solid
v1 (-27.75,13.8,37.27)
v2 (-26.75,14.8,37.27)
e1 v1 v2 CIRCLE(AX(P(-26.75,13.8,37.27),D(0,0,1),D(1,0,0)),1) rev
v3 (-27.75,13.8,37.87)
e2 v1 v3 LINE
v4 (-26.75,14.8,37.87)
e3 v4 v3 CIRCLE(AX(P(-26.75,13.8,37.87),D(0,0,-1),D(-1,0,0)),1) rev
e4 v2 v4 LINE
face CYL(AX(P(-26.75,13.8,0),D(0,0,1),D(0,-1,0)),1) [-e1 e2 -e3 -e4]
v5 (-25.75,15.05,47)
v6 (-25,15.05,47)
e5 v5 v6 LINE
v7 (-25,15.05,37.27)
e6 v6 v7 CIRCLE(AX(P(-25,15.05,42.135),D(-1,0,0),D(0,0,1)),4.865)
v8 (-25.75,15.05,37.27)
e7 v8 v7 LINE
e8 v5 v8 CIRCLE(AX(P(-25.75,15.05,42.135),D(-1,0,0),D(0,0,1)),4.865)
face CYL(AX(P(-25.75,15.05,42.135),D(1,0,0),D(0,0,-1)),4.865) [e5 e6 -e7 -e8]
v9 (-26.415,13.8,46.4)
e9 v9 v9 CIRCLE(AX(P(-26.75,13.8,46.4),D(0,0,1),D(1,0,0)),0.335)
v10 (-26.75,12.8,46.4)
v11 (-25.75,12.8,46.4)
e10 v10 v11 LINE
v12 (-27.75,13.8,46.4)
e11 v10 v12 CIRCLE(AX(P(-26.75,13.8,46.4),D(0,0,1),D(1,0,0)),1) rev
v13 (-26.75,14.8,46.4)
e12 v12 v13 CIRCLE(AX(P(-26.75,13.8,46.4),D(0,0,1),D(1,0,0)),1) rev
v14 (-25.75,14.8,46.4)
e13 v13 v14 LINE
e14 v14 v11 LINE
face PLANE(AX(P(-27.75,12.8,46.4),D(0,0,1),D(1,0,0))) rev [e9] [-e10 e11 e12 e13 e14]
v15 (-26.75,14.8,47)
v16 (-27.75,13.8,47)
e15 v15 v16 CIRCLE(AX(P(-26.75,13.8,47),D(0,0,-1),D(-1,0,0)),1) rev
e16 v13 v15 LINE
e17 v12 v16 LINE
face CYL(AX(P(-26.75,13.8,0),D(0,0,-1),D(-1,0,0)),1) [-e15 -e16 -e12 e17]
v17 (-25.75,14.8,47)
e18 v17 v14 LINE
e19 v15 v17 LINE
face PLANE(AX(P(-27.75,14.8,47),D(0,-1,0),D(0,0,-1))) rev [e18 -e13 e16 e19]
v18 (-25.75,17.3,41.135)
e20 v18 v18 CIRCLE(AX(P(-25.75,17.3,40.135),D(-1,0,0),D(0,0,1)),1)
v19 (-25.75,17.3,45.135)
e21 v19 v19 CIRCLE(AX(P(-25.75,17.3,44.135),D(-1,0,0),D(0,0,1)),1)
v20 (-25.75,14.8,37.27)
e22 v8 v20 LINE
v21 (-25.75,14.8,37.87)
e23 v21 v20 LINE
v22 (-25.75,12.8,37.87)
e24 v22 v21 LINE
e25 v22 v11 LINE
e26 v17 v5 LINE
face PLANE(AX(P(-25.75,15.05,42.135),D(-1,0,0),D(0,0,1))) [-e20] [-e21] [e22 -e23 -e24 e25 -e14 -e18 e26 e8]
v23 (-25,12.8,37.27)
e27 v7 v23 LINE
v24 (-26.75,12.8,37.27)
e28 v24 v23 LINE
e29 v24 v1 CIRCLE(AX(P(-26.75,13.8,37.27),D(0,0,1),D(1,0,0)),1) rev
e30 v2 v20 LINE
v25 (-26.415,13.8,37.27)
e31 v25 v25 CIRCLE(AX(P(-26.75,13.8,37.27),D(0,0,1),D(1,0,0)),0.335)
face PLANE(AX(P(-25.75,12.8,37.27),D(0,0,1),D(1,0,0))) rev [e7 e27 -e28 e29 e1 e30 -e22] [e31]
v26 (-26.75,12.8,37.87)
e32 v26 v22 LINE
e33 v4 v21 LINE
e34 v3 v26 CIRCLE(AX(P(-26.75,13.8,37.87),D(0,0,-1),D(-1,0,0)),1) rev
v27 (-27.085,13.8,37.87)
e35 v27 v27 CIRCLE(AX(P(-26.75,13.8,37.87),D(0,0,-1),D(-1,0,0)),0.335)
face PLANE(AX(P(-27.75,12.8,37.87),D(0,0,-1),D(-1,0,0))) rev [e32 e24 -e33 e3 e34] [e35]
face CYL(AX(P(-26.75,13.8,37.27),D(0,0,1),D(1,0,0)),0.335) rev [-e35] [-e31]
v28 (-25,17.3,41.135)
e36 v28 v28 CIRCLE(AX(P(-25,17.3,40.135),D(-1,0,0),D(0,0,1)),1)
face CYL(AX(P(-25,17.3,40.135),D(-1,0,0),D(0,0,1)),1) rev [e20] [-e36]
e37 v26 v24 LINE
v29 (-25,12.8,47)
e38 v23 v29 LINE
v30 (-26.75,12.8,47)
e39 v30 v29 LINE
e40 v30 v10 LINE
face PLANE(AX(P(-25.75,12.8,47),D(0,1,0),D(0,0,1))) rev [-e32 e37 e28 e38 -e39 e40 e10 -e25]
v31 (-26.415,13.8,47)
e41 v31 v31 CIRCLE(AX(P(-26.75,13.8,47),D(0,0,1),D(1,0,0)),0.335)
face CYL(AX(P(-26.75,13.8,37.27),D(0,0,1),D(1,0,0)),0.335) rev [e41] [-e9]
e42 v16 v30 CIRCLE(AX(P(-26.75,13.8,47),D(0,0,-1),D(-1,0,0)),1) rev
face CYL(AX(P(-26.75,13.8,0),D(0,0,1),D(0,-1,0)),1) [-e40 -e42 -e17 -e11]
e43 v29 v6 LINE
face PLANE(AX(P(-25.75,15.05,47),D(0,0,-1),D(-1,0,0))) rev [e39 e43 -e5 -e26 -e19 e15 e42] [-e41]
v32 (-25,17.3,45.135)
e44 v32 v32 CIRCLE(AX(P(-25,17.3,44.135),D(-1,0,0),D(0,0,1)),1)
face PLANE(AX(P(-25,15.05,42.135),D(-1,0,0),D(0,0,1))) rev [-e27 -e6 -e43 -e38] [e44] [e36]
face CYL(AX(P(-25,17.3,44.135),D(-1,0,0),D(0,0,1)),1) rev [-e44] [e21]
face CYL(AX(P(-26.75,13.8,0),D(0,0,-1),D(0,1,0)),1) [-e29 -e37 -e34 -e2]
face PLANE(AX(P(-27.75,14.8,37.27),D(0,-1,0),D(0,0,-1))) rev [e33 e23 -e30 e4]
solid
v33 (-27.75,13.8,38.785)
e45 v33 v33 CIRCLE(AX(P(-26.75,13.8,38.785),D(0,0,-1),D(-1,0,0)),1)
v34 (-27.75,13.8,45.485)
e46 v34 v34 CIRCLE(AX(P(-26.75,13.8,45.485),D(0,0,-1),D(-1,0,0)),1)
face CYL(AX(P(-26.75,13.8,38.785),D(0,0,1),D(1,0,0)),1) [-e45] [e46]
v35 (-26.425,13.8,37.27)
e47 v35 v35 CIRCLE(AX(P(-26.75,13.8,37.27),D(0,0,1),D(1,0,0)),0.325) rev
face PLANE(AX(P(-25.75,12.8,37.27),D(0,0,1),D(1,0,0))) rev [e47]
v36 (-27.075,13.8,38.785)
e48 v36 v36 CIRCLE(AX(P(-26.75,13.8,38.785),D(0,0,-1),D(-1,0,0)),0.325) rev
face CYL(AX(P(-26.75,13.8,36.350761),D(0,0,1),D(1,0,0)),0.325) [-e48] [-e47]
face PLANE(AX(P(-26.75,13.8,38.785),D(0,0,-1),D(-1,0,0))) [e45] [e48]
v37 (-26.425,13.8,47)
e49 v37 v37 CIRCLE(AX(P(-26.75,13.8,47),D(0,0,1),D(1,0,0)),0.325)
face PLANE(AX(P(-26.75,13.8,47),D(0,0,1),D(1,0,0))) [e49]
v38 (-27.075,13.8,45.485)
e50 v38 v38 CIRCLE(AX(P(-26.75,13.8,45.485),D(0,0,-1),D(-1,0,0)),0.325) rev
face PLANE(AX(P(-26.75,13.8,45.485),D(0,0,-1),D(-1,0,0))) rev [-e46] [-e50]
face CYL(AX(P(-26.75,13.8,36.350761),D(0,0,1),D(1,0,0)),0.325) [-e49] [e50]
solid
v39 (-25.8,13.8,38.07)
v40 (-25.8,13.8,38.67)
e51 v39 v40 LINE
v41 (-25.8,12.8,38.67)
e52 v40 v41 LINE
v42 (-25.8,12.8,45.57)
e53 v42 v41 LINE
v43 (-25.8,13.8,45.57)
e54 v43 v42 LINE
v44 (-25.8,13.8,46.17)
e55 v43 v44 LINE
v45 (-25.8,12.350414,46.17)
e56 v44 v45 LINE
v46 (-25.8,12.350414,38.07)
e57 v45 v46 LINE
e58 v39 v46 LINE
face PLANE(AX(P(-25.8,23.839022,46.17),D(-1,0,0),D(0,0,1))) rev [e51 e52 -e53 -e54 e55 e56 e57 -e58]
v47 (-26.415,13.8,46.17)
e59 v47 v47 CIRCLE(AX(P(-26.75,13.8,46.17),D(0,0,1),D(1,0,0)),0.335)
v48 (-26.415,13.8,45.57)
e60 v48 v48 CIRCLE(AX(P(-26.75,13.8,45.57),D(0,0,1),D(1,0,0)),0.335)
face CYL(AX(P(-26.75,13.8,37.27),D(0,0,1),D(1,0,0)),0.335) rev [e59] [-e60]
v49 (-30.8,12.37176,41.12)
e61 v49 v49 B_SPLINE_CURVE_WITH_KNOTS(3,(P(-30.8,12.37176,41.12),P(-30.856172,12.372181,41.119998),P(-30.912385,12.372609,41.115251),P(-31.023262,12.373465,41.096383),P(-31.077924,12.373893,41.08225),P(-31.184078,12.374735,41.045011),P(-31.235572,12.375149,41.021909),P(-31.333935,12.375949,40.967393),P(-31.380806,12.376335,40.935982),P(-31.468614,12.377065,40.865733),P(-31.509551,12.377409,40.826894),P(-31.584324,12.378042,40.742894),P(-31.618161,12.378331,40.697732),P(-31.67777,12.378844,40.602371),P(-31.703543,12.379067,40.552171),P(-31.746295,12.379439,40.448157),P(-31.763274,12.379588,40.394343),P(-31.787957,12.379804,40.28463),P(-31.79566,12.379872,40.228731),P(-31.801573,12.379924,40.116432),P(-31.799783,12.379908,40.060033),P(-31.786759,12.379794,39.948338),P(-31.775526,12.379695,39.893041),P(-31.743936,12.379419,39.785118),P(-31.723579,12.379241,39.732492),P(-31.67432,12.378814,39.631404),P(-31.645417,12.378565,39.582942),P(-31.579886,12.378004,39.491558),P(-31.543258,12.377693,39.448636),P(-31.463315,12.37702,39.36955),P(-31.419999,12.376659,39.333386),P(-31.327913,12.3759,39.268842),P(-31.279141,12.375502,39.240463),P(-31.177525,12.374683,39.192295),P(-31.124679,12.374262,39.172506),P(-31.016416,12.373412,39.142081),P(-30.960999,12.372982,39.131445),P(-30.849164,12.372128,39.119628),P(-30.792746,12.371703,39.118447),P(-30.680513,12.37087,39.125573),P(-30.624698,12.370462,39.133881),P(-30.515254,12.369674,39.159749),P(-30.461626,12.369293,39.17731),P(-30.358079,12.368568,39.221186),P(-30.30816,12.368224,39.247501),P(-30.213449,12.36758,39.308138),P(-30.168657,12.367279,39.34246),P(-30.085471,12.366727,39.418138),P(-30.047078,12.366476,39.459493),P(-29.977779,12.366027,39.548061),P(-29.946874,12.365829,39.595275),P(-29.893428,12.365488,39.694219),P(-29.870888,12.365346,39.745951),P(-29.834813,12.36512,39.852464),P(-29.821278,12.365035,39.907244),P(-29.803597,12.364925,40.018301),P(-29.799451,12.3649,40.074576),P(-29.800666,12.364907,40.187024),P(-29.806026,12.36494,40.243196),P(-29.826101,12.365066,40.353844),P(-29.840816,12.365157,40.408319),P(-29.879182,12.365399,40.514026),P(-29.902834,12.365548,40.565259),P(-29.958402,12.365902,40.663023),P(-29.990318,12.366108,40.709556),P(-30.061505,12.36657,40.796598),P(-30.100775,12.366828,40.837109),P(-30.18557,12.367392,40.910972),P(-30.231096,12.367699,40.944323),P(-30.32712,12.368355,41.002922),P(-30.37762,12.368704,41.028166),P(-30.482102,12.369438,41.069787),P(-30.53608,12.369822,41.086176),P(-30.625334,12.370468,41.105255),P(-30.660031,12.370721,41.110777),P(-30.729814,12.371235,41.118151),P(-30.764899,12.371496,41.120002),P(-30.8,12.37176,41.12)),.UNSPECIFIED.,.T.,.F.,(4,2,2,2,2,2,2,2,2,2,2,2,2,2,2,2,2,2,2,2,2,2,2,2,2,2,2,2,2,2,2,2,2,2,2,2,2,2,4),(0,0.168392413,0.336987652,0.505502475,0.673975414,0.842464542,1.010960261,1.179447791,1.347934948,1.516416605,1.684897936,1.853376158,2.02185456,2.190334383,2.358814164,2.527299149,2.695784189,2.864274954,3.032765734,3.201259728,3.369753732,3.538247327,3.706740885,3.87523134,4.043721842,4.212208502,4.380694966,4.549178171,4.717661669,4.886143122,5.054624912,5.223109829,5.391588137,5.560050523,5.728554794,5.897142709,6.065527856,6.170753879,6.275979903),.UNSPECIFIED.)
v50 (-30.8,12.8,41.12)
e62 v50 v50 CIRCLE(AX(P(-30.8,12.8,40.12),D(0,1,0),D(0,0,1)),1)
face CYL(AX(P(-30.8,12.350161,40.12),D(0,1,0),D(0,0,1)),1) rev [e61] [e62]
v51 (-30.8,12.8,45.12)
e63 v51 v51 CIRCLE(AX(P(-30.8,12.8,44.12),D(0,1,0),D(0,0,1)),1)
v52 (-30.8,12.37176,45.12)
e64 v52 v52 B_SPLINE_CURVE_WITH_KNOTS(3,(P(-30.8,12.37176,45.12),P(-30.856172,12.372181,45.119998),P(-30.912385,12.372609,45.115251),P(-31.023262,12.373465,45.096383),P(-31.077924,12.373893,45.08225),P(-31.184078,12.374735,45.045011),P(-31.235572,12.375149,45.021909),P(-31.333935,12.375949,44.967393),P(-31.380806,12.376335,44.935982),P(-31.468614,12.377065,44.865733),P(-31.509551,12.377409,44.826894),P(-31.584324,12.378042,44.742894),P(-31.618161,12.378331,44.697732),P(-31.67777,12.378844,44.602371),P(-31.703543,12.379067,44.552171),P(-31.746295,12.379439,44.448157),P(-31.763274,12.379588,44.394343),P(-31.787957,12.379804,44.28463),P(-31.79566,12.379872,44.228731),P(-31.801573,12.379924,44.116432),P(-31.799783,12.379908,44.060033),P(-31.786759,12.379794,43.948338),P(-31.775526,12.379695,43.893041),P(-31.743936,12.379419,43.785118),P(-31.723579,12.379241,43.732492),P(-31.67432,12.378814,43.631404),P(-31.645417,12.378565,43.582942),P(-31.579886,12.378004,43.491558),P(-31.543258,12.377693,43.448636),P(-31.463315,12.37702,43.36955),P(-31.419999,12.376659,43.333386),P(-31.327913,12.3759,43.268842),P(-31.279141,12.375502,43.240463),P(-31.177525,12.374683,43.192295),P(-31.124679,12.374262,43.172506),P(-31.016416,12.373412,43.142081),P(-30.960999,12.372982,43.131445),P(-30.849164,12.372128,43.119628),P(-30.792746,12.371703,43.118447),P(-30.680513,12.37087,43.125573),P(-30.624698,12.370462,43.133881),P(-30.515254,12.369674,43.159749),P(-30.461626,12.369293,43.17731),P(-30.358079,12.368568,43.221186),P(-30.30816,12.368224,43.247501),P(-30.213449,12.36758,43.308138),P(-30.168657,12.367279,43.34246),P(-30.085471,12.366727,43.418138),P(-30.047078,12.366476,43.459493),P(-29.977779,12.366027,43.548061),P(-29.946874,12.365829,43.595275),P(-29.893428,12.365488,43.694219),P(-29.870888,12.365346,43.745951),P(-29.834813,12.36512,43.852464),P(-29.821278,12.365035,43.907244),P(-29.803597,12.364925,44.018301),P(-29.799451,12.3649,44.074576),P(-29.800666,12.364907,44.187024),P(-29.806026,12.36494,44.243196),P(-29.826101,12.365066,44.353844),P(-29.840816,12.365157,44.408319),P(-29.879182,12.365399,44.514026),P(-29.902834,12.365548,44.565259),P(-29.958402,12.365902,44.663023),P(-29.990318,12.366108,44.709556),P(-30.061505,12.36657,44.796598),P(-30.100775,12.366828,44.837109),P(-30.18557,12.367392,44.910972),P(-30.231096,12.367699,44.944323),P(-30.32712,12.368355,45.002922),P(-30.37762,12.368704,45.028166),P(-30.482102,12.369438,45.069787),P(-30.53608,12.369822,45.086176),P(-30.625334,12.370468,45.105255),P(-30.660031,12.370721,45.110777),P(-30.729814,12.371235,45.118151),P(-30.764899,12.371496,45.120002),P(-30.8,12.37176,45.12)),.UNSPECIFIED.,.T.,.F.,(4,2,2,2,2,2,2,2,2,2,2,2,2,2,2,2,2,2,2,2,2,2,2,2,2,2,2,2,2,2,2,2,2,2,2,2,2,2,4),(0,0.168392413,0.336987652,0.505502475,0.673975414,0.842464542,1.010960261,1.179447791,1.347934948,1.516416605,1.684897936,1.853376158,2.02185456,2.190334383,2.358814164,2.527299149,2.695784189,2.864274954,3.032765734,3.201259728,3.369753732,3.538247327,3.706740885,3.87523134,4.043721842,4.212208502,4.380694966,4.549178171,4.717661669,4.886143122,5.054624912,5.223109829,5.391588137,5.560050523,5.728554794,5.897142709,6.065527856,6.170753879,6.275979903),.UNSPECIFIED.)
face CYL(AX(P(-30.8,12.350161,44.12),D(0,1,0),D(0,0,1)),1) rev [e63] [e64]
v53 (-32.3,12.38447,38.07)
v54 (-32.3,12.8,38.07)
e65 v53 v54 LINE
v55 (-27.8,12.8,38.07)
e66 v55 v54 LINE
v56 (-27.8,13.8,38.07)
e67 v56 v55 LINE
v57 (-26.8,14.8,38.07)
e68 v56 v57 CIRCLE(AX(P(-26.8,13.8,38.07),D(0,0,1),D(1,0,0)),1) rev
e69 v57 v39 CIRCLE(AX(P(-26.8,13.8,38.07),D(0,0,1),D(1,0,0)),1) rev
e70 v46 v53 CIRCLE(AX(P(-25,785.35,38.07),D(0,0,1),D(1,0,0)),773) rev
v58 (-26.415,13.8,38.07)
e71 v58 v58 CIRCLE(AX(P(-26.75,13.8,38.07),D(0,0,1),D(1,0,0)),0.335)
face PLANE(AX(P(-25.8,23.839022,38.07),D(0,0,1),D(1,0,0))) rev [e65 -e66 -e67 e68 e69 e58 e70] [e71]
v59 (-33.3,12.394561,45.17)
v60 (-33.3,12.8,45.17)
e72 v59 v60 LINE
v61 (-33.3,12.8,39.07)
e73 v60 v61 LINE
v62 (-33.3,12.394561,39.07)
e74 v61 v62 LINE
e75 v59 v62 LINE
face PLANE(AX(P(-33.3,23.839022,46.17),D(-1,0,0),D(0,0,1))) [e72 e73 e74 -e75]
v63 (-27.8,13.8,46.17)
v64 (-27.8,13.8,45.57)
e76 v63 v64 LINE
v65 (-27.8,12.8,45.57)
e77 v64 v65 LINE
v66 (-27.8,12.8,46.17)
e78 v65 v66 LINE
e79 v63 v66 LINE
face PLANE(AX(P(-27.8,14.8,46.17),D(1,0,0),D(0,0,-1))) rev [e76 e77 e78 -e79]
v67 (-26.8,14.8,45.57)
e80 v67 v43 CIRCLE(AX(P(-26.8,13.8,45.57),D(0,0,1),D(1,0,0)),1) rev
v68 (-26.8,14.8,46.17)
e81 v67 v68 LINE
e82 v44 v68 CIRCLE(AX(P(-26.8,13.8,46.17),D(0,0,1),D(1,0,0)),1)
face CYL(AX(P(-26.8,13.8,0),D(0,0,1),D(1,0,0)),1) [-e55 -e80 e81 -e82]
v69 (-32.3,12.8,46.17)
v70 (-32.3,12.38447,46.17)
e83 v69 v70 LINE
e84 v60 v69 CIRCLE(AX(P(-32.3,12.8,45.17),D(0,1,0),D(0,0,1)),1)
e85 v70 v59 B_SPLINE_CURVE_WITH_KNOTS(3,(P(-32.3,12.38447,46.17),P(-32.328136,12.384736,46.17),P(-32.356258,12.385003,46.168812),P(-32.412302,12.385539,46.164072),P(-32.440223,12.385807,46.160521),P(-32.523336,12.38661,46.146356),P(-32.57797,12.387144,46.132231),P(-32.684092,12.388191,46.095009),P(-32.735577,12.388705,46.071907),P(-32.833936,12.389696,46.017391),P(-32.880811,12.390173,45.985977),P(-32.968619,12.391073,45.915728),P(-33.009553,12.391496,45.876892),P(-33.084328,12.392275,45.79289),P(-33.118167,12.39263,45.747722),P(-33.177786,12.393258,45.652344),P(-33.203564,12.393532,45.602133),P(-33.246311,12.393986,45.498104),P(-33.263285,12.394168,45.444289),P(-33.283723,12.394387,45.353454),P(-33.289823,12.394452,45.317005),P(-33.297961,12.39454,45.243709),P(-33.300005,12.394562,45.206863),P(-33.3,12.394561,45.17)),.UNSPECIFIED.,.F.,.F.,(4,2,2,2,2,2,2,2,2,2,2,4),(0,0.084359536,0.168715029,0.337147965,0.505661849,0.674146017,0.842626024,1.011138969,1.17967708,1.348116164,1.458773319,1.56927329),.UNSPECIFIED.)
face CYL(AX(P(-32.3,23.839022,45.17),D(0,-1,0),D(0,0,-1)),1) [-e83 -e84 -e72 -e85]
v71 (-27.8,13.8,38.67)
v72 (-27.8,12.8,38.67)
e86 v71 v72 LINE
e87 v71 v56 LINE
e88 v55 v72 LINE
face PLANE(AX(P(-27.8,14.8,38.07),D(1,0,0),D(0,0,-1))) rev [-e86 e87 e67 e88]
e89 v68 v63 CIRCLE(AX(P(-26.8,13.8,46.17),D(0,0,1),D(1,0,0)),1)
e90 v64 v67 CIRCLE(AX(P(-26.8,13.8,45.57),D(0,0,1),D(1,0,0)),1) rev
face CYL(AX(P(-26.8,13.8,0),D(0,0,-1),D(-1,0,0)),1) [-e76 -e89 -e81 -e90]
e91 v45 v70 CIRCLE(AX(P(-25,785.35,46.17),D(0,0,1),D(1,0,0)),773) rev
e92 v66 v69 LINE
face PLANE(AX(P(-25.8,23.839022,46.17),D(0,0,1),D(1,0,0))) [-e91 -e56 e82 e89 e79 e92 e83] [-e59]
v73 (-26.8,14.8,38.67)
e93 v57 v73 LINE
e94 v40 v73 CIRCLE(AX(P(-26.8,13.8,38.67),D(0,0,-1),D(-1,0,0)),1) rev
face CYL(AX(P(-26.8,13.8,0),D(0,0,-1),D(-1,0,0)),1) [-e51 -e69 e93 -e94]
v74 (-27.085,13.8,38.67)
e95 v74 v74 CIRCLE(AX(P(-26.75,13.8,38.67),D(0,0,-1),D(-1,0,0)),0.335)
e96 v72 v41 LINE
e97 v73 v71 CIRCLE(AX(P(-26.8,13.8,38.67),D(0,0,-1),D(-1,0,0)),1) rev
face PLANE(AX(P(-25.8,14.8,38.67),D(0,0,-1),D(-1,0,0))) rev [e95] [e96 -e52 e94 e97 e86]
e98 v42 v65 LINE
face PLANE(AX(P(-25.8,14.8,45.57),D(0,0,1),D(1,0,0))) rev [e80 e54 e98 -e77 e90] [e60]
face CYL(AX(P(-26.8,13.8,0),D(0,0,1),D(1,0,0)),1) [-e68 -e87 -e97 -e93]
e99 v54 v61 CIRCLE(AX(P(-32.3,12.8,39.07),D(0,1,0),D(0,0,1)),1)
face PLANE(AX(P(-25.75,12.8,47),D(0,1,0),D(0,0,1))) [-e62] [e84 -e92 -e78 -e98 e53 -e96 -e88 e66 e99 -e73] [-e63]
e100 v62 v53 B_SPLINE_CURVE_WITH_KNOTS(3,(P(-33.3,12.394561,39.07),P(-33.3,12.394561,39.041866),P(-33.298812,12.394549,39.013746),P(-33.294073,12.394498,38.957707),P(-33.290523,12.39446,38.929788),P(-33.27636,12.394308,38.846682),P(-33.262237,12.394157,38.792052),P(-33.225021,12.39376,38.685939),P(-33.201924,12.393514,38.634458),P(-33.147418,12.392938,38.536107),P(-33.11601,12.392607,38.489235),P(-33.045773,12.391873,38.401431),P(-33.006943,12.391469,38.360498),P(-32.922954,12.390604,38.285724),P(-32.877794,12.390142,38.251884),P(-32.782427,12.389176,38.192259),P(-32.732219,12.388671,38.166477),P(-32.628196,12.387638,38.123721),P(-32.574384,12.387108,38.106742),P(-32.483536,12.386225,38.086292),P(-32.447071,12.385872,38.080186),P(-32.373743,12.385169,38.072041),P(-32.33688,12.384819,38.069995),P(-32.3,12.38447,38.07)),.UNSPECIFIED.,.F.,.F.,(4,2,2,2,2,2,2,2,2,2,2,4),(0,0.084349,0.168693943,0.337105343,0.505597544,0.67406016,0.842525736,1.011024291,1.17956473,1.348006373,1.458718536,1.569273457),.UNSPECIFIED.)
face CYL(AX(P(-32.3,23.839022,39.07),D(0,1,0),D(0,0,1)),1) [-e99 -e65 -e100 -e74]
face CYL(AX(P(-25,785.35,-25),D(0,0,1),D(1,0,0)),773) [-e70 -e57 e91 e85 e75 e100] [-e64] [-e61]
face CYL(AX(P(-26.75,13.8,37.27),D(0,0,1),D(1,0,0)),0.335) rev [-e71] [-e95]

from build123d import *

# Parameters (mm, degrees)
BOSS_EXTRUDE1_DEPTH = 0.75
SKETCH2_W           = 2
SKETCH2_H           = 0.6
BOSS_EXTRUDE2_DEPTH = 2
FILLET1_R           = 1
SKETCH4_W           = 8.1
SKETCH4_H           = 7.5
BOSS_EXTRUDE3_DEPTH = 0.449838501
SKETCH6_W           = 2
SKETCH6_H           = 0.6
BOSS_EXTRUDE4_DEPTH = 2
FILLET2_R           = 1
SKETCH8_R           = 0.335
CUT_EXTRUDE1_DEPTH  = 41.002126506
FILLET3_R           = 1
SKETCH9_R           = 0.325
BOSS_EXTRUDE5_DEPTH = 9.73
SKETCH10_R          = 1
BOSS_EXTRUDE6_DEPTH = 3.35
SKETCH13_R          = 1
CUT_EXTRUDE2_DEPTH  = 59.038894071
SKETCH11_R          = 1
CUT_EXTRUDE3_DEPTH  = 52.600481829
CAVITY1_START       = 38.07
CAVITY1_DEPTH       = 8.1


# Read off the part's stored shape, not the designer's step: Cavity1
with BuildPart() as part:
    # Sketch1 → Boss-Extrude1 (new body)
    with BuildSketch(Plane(origin=(-25, 0, 0), x_dir=(0, -1, 0), z_dir=(-1, 0, 0))):
        with BuildLine():
            Line((-15.05, 47), (-12.8, 47))
            Line((-12.8, 47), (-12.8, 37.27))
            Line((-12.8, 37.27), (-15.05, 37.27))
            ThreePointArc((-15.05, 37.27), (-19.915, 42.135), (-15.05, 47))
        make_face()
    extrude(amount=BOSS_EXTRUDE1_DEPTH)

    # Sketch2 → Boss-Extrude2 (add)
    with BuildSketch(Plane(origin=(-25.75, 0, 0), x_dir=(0, -1, 0), z_dir=(-1, 0, 0))):
        with Locations((-13.8, 46.7)):
            Rectangle(SKETCH2_W, SKETCH2_H)
        with Locations((-13.8, 37.57)):
            Rectangle(SKETCH2_W, SKETCH2_H)
    extrude(amount=BOSS_EXTRUDE2_DEPTH)

    # Fillet1
    fillet1_edges = [part.edges().sort_by_distance(p)[0] for p in [
        (-27.75, 14.8, 37.57),
        (-27.75, 12.8, 37.57),
        (-27.75, 14.8, 46.7),
        (-27.75, 12.8, 46.7),
    ]]
    fillet(fillet1_edges, radius=FILLET1_R - 0.0001)  # a hair under: the kernel refuses the full size


with BuildPart() as body_2:
    # Sketch4 → Boss-Extrude3 (new body)
    with BuildSketch(Plane(origin=(0, 12.350161499, 0), x_dir=(0, 0, -1), z_dir=(0, 1, 0))):
        with Locations((-42.12, 29.55)):
            Rectangle(SKETCH4_W, SKETCH4_H)
    extrude(amount=BOSS_EXTRUDE3_DEPTH)

    # Sketch6 → Boss-Extrude4 (add)
    with BuildSketch(Plane(origin=(0, 12.8, 0), x_dir=(1, 0, 0), z_dir=(0, 1, 0))):
        with Locations((-26.8, -45.87)):
            Rectangle(SKETCH6_W, SKETCH6_H)
        with Locations((-26.8, -38.37)):
            Rectangle(SKETCH6_W, SKETCH6_H)
    extrude(amount=BOSS_EXTRUDE4_DEPTH)

    # Fillet2
    fillet2_edges = [body_2.edges().sort_by_distance(p)[0] for p in [
        (-25.8, 14.8, 45.87),
        (-27.8, 14.8, 45.87),
        (-25.8, 14.8, 38.37),
        (-27.8, 14.8, 38.37),
    ]]
    fillet(fillet2_edges, radius=FILLET2_R - 0.0001)  # a hair under: the kernel refuses the full size


with BuildPart() as cut_extrude1_tool:
    # Sketch8 → Cut-Extrude1 (new, through all)
    with BuildSketch(Plane.XY.offset(47)):
        with Locations((-26.75, 13.8)):
            Circle(SKETCH8_R)
    extrude(amount=-CUT_EXTRUDE1_DEPTH)


with BuildPart() as part_1:
    add(part.part)

    # Cut-Extrude1: cut by cut_extrude1_tool
    add(cut_extrude1_tool.part, mode=Mode.SUBTRACT)

    # Sketch11 → Cut-Extrude3 (cut, through all)
    with BuildSketch(Plane(origin=(-25.75, 0, 0), x_dir=(0, -1, 0), z_dir=(-1, 0, 0))):
        with Locations(Location((-17.3, 40.135, 0), (0, 0, 90))):
            Circle(SKETCH11_R)
        with Locations(Location((-17.3, 44.135, 0), (0, 0, 90))):
            Circle(SKETCH11_R)
    extrude(amount=-CUT_EXTRUDE3_DEPTH, mode=Mode.SUBTRACT)


with BuildPart() as body_2_1:
    add(body_2.part)

    # Cut-Extrude1: cut by cut_extrude1_tool
    add(cut_extrude1_tool.part, mode=Mode.SUBTRACT)

    # Fillet3
    fillet3_edges = [body_2_1.edges().sort_by_distance(p)[0] for p in [
        (-33.3, 12.575080749, 38.07),
        (-33.3, 12.575080749, 46.17),
    ]]
    fillet(fillet3_edges, radius=FILLET3_R)

    # Sketch13 → Cut-Extrude2 (cut, through all)
    with BuildSketch(Plane(origin=(0, 12.8, 0), x_dir=(-1, 0, 0), z_dir=(0, 1, 0))):
        with Locations(Location((30.8, 44.12, 0), (0, 0, 90))):
            Circle(SKETCH13_R)
        with Locations(Location((30.8, 40.12, 0), (0, 0, 90))):
            Circle(SKETCH13_R)
    extrude(amount=-CUT_EXTRUDE2_DEPTH, mode=Mode.SUBTRACT)

    # Cavity1 outline → Cavity1 (cut)
    with BuildSketch(Plane.XY.offset(CAVITY1_START)):
        with BuildLine():
            ThreePointArc((-25.8, 12.350413972), (-29.550054299, 12.363391445), (-33.300001511, 12.394561456))
            Line((-33.300001511, 12.394561456), (-33.3, 12.350161499))
            Line((-33.3, 12.350161499), (-25.8, 12.350161499))
            Line((-25.8, 12.350161499), (-25.8, 12.350413972))
        make_face()
    extrude(amount=CAVITY1_DEPTH, mode=Mode.SUBTRACT)


with BuildPart() as body_3:
    # Sketch9 → Boss-Extrude5 (new body)
    with BuildSketch(Plane.XY.offset(47)):
        with Locations((-26.75, 13.8)):
            Circle(SKETCH9_R)
    extrude(amount=-BOSS_EXTRUDE5_DEPTH)

    # Sketch10 → Boss-Extrude6 (add, symmetric)
    with BuildSketch(Plane(origin=(0, 0, 42.135), x_dir=(-1, 0, 0), z_dir=(0, 0, -1))):
        with Locations((26.75, 13.8)):
            Circle(SKETCH10_R)
    extrude(amount=BOSS_EXTRUDE6_DEPTH, both=True)


solid = Compound([part_1.part, body_2_1.part, body_3.part])
